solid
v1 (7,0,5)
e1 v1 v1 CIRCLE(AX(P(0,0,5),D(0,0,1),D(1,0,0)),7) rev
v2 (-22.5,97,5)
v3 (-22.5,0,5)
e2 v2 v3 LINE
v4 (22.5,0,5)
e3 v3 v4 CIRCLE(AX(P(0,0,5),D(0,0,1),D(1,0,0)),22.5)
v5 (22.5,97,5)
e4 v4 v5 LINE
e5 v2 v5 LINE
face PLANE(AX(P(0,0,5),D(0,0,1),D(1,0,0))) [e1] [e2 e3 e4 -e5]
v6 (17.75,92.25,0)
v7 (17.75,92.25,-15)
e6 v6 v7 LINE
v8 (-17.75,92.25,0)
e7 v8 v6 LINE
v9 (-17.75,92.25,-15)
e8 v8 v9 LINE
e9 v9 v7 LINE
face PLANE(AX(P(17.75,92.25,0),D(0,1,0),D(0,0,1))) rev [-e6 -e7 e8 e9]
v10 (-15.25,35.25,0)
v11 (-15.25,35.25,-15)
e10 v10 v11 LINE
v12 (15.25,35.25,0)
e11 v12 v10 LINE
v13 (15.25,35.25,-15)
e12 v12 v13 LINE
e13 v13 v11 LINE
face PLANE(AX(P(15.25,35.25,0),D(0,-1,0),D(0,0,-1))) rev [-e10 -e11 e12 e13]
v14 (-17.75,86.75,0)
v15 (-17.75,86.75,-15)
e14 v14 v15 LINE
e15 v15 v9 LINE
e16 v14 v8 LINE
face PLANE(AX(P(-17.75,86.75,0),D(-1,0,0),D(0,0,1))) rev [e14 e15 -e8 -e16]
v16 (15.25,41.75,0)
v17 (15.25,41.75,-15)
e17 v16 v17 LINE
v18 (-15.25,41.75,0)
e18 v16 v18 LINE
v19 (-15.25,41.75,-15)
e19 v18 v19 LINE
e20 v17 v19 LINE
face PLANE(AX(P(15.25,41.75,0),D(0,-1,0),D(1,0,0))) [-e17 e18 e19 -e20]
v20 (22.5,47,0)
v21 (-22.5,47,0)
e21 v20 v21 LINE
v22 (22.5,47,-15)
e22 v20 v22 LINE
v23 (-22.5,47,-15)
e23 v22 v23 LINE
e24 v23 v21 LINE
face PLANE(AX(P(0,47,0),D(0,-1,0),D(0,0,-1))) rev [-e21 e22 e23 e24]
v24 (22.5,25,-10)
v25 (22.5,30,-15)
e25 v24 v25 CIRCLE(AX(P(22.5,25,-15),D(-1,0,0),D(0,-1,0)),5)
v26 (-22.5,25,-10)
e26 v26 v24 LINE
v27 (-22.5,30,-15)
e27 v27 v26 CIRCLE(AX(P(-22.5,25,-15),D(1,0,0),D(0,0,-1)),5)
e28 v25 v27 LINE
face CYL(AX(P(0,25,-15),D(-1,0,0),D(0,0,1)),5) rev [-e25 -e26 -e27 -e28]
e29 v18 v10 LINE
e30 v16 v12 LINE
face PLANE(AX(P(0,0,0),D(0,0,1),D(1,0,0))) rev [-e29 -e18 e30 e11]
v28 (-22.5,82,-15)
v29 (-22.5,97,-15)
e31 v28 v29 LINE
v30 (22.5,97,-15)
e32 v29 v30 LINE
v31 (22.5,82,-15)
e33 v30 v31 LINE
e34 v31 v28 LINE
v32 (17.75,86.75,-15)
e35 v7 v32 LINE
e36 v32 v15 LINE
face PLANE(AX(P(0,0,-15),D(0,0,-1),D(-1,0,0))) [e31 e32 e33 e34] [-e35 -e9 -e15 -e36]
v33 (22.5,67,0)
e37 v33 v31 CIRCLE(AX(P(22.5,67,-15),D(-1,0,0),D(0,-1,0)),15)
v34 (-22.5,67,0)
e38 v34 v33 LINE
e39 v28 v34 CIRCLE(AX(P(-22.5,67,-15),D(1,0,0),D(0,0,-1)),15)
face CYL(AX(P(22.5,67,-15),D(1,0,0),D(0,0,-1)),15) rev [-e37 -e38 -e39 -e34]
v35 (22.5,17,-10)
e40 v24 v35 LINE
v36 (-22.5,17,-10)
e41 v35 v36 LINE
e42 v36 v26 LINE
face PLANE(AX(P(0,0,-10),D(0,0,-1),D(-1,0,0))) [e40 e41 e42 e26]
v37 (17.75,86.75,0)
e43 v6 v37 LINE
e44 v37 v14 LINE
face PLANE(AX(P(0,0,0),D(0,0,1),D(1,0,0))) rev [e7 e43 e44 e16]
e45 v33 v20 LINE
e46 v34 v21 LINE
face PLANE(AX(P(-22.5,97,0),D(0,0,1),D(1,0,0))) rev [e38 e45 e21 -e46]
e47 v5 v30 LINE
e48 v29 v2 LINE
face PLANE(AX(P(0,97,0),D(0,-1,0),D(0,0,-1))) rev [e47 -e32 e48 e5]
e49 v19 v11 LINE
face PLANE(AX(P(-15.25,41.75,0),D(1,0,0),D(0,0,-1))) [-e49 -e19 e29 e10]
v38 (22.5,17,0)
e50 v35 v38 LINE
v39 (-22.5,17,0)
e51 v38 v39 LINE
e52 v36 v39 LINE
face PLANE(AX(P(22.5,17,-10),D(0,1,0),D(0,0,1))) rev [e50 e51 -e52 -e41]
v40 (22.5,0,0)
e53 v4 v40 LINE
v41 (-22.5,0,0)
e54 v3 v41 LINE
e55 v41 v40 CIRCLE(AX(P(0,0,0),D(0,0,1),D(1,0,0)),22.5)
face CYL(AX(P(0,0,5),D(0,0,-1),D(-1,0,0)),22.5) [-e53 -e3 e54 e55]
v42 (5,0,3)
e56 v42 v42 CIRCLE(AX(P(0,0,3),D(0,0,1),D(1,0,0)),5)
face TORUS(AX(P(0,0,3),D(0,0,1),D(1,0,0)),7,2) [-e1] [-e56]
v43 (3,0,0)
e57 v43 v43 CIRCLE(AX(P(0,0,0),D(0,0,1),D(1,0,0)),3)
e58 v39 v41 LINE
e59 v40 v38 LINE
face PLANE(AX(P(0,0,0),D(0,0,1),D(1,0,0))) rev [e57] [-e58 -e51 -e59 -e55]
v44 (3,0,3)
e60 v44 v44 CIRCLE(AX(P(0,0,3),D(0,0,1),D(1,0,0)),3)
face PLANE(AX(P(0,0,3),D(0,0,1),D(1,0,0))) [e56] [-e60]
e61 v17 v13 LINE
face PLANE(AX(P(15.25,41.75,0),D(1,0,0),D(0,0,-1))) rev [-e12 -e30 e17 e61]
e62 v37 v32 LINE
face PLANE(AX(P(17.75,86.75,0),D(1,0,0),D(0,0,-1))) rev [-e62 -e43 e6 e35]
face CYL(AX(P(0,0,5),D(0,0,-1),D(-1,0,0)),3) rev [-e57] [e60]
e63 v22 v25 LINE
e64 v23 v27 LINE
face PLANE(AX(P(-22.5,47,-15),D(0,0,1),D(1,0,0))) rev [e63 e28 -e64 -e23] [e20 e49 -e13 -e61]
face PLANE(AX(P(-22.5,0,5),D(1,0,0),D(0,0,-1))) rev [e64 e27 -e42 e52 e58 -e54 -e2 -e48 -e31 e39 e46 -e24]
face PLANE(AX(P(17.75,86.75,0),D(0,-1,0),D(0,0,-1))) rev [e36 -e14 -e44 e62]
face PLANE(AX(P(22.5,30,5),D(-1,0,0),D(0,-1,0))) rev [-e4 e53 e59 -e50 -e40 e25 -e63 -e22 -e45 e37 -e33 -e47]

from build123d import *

# Parameters (mm, degrees)
ESBO_O2_R                = 3
RESSALTO_EXTRUS_O1_DEPTH = 5
ESBO_O11_R               = 5
CORTE_EXTRUS_O3_DEPTH    = 2
ESBO_O3_W                = 45
ESBO_O3_H                = 13
RESSALTO_EXTRUS_O2_DEPTH = 10
ESBO_O4_W                = 45
ESBO_O4_H                = 20
RESSALTO_EXTRUS_O3_DEPTH = 17
ESBO_O6_W                = 30.5
ESBO_O6_H                = 6.5
CORTE_EXTRUS_O1_DEPTH    = 15
ESBO_O7_W                = 45
ESBO_O7_H                = 5
RESSALTO_EXTRUS_O4_DEPTH = 50
ESBO_O8_W                = 45
ESBO_O8_H                = 15
RESSALTO_EXTRUS_O5_DEPTH = 15
ESBO_O9_W                = 35.5
ESBO_O9_H                = 5.5
CORTE_EXTRUS_O2_DEPTH    = 15
FILETE4_R                = 5
FILETE6_R                = 15
FILETE7_R                = 2


with BuildPart() as part:
    # Esboço2 → Ressalto-extrusão1 (new body)
    with BuildSketch(Plane.XY):
        with BuildLine():
            Line((-22.5, 0), (-22.5, 30))
            Line((-22.5, 30), (22.5, 30))
            Line((22.5, 30), (22.5, 0))
            ThreePointArc((22.5, 0), (0, -22.5), (-22.5, 0))
        make_face()
        Circle(ESBO_O2_R, mode=Mode.SUBTRACT)
    extrude(amount=RESSALTO_EXTRUS_O1_DEPTH)

    # Esboço11 → Corte-extrusão3 (cut)
    with BuildSketch(Plane.XY.offset(5)):
        Circle(ESBO_O11_R)
    extrude(amount=-CORTE_EXTRUS_O3_DEPTH, mode=Mode.SUBTRACT)

    # Esboço3 → Ressalto-extrusão2 (add)
    with BuildSketch(Plane(origin=(0, 0, 0), x_dir=(-1, 0, 0), z_dir=(0, 0, -1))):
        with Locations((0, 23.5)):
            Rectangle(ESBO_O3_W, ESBO_O3_H)
    extrude(amount=RESSALTO_EXTRUS_O2_DEPTH)

    # Esboço4 → Ressalto-extrusão3 (add)
    with BuildSketch(Plane(origin=(0, 30, 0), x_dir=(1, 0, 0), z_dir=(0, 1, 0))):
        with Locations((0, 5)):
            Rectangle(ESBO_O4_W, ESBO_O4_H)
    extrude(amount=RESSALTO_EXTRUS_O3_DEPTH)

    # Esboço6 → Corte-extrusão1 (cut)
    with BuildSketch(Plane(origin=(0, 0, -15), x_dir=(-1, 0, 0), z_dir=(0, 0, -1))):
        with Locations((0, 38.5)):
            Rectangle(ESBO_O6_W, ESBO_O6_H)
    extrude(amount=-CORTE_EXTRUS_O1_DEPTH, mode=Mode.SUBTRACT)

    # Esboço7 → Ressalto-extrusão4 (add)
    with BuildSketch(Plane(origin=(0, 47, 0), x_dir=(1, 0, 0), z_dir=(0, 1, 0))):
        with Locations((0, -2.5)):
            Rectangle(ESBO_O7_W, ESBO_O7_H)
    extrude(amount=RESSALTO_EXTRUS_O4_DEPTH)

    # Esboço8 → Ressalto-extrusão5 (add)
    with BuildSketch(Plane(origin=(0, 0, 0), x_dir=(-1, 0, 0), z_dir=(0, 0, -1))):
        with Locations((0, 89.5)):
            Rectangle(ESBO_O8_W, ESBO_O8_H)
    extrude(amount=RESSALTO_EXTRUS_O5_DEPTH)

    # Esboço9 → Corte-extrusão2 (cut)
    with BuildSketch(Plane(origin=(0, 0, -15), x_dir=(-1, 0, 0), z_dir=(0, 0, -1))):
        with Locations((0, 89.5)):
            Rectangle(ESBO_O9_W, ESBO_O9_H)
    extrude(amount=-CORTE_EXTRUS_O2_DEPTH, mode=Mode.SUBTRACT)

    # Filete4
    filete4_edges = [part.edges().sort_by_distance(p)[0] for p in [
        (0, 30, -10),
    ]]
    fillet(filete4_edges, radius=FILETE4_R - 0.0001)  # a hair under: the kernel refuses the full size

    # Filete6
    filete6_edges = [part.edges().sort_by_distance(p)[0] for p in [
        (0, 82, 0),
    ]]
    fillet(filete6_edges, radius=FILETE6_R - 0.0001)  # a hair under: the kernel refuses the full size

    # Filete7
    filete7_edges = [part.edges().sort_by_distance(p)[0] for p in [
        (-5, 0, 5),
    ]]
    fillet(filete7_edges, radius=FILETE7_R - 0.0001)  # a hair under: the kernel refuses the full size


solid = part.part
